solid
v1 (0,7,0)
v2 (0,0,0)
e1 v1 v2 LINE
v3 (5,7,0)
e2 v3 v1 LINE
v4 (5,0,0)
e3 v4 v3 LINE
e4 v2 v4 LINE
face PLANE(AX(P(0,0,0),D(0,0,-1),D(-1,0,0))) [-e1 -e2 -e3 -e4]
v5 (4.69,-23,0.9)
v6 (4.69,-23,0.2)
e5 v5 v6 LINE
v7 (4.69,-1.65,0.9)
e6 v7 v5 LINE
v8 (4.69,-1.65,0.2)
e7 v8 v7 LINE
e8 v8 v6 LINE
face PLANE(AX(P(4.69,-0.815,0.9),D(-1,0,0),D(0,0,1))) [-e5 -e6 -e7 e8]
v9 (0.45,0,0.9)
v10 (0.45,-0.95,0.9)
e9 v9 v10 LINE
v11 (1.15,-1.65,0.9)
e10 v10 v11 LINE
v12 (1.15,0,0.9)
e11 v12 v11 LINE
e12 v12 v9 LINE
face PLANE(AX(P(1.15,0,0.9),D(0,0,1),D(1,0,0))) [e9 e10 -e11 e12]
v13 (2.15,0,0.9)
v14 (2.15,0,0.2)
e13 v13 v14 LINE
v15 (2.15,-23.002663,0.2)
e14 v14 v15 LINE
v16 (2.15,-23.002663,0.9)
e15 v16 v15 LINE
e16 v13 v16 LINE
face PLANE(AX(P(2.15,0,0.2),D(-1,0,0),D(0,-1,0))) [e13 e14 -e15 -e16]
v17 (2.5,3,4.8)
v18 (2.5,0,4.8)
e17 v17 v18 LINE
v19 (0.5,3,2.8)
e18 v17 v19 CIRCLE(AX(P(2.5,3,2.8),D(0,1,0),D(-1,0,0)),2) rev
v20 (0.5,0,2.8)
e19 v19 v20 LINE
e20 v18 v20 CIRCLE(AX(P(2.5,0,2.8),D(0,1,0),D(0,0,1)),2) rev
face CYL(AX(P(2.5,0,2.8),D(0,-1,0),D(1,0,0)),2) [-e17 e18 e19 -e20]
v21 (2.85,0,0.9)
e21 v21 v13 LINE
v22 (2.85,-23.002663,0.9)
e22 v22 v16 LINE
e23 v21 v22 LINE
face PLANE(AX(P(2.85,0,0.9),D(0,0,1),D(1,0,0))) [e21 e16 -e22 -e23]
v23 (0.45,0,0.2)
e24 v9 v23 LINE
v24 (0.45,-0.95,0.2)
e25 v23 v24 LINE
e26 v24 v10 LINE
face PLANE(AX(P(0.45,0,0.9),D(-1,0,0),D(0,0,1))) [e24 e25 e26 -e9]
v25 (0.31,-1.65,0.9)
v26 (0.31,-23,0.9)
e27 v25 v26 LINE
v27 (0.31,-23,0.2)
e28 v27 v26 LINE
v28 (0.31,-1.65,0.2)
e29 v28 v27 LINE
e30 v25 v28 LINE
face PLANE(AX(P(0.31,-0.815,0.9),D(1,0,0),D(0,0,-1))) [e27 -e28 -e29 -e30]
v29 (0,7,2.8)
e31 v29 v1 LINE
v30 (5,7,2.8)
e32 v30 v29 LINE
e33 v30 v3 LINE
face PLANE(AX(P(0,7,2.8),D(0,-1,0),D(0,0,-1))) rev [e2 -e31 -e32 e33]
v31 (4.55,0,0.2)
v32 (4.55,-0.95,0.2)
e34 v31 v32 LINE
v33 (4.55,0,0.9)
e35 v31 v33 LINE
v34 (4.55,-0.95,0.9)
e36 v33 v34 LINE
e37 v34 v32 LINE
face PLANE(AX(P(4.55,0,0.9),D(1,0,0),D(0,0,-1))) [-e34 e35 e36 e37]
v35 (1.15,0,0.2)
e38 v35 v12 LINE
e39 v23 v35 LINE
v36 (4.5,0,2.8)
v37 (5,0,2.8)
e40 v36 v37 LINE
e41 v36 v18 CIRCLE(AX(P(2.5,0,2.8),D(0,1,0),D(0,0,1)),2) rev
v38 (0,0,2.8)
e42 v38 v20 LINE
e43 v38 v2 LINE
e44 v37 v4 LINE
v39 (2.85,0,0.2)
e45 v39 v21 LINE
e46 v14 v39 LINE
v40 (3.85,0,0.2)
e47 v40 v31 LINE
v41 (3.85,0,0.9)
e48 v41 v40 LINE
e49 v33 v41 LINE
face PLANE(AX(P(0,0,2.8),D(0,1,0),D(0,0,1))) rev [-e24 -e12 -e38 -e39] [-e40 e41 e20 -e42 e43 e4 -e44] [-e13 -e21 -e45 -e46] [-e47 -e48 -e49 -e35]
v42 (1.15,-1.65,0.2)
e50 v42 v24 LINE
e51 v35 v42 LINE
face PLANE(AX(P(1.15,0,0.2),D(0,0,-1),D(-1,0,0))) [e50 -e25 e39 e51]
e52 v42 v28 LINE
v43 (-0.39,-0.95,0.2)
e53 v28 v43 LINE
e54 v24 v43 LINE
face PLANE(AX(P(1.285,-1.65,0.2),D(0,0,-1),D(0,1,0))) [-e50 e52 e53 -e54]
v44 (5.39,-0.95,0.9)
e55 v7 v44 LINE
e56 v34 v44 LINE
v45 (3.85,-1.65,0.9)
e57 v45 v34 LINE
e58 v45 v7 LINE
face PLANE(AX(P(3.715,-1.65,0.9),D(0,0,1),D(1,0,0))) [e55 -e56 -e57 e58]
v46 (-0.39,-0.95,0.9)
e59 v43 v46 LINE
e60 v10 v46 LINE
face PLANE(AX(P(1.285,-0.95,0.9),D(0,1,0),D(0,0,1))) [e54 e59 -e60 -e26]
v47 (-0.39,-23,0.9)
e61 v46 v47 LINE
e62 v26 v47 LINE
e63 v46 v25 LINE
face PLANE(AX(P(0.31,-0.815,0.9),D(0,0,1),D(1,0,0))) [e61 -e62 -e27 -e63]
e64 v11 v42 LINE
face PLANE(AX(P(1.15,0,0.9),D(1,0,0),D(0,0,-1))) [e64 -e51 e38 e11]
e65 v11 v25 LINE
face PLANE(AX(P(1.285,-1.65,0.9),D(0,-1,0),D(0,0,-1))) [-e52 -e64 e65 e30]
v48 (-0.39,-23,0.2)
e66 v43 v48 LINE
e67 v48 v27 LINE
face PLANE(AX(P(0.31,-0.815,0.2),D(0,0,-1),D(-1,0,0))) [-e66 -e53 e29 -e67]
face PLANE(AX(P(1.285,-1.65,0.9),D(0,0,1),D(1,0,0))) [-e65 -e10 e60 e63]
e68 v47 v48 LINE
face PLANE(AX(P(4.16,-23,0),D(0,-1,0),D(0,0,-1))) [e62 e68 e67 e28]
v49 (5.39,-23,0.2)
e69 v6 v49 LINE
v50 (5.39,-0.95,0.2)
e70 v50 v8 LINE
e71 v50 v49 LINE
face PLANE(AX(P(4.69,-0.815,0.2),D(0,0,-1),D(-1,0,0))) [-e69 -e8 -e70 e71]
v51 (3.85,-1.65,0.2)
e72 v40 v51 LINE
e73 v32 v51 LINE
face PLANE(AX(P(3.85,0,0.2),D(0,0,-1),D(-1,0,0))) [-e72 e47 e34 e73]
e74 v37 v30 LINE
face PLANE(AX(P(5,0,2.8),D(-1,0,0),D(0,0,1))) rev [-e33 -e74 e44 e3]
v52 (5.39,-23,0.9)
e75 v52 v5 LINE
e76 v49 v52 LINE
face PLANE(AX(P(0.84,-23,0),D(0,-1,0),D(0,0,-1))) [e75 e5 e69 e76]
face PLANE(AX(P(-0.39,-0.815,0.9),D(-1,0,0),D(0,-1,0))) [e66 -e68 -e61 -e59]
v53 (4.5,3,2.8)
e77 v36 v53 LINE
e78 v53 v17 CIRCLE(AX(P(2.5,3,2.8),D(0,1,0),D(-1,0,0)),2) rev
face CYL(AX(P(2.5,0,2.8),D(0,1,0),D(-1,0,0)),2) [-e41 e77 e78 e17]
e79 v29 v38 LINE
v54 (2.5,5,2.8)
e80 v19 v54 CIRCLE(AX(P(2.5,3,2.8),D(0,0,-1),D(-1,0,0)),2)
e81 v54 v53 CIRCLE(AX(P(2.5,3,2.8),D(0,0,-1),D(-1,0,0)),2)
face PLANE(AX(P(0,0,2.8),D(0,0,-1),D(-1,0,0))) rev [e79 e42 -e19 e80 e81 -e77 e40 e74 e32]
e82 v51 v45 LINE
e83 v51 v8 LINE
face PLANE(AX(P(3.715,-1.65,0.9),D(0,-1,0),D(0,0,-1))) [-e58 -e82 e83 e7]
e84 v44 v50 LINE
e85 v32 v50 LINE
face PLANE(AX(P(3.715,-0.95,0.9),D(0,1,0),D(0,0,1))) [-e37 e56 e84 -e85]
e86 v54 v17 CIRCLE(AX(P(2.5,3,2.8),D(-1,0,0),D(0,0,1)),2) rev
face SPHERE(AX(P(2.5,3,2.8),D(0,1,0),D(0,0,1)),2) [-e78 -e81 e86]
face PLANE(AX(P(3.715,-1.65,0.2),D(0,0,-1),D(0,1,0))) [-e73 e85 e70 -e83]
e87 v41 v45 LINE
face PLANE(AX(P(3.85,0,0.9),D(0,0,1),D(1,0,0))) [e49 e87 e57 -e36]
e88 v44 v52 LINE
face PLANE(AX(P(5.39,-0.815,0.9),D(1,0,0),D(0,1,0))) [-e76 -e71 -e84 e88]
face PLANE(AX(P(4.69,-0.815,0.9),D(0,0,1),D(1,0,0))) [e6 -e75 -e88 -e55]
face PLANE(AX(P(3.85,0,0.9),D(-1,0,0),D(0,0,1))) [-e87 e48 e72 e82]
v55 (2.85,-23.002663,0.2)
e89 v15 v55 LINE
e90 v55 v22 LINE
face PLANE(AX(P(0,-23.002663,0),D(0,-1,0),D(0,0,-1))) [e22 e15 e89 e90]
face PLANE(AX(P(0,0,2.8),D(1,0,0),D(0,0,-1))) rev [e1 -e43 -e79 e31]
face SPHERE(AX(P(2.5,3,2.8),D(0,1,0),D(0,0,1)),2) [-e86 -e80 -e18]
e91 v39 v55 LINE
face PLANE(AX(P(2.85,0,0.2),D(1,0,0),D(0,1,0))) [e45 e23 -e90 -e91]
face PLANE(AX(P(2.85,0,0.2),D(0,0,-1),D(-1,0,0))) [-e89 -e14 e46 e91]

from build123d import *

# Parameters (mm, degrees)
IZIM1_W                     = 5
IZIM1_H                     = 7
Y_KSEKLIK_EKSTR_ZYON1_DEPTH = 2.8
IZIM2_W                     = 4
IZIM2_H                     = 5
Y_KSEKLIK_EKSTR_ZYON2_DEPTH = 2
RADYUS2_R                   = 2
IZIM3_W                     = 0.7
IZIM3_H                     = 0.7
IZIM5_W                     = 0.7
IZIM5_H                     = 0.7


with BuildPart() as part:
    # Çizim1 → Yükseklik-Ekstrüzyon1 (new body)
    with BuildSketch(Plane.XY):
        with Locations((2.5, 3.5)):
            Rectangle(IZIM1_W, IZIM1_H)
    extrude(amount=Y_KSEKLIK_EKSTR_ZYON1_DEPTH)

    # Çizim2 → Yükseklik-Ekstrüzyon2 (add)
    with BuildSketch(Plane.XY.offset(2.8)):
        with Locations((2.5, 2.5)):
            Rectangle(IZIM2_W, IZIM2_H)
    extrude(amount=Y_KSEKLIK_EKSTR_ZYON2_DEPTH)

    # Radyus2
    radyus2_edges = [part.edges().sort_by_distance(p)[0] for p in [
        (4.5, 2.5, 4.8),
    ]]
    fillet(radyus2_edges, radius=RADYUS2_R - 0.0001)  # a hair under: the kernel refuses the full size
    radyus2_2_edges = [part.edges().sort_by_distance(p)[0] for p in [
        (1.50005, 5, 4.8),
    ]]
    fillet(radyus2_2_edges, radius=RADYUS2_R - 0.0001)  # a hair under: the kernel refuses the full size
    radyus2_3_edges = [part.edges().sort_by_distance(p)[0] for p in [
        (0.5, 1.50005, 4.8),
    ]]
    fillet(radyus2_3_edges, radius=RADYUS2_R - 0.0001)  # a hair under: the kernel refuses the full size

    # Süpür1: sweep along a path in Çizim4
    with BuildLine(Plane(origin=(0, 0, 0.55), x_dir=(-1, 0, 0), z_dir=(0, 0, -1))) as s_p_r1_path:
        Line((-4.2, 0), (-4.2, -1.3))
        Line((-4.2, -1.3), (-5.04, -1.3))
        Line((-5.04, -1.3), (-5.04, -23))
    # Çizim3 → Süpür1 (sweep)
    with BuildSketch(Plane.XZ):
        with Locations((4.2, 0.55)):
            Rectangle(IZIM3_W, IZIM3_H)
    s_p_r1 = sweep(path=s_p_r1_path.line, transition=Transition.RIGHT)

    # Aynalama1: Süpür1 across plane
    add(s_p_r1.mirror(Plane(origin=(2.5, 0, 0), x_dir=(0, 0, 1), z_dir=(1, 0, 0))))

    # Süpür2: sweep along a path in Çizim6
    with BuildLine(Plane(origin=(0, 0, 0.55), x_dir=(-1, 0, 0), z_dir=(0, 0, -1))) as s_p_r2_path:
        Line((-2.5, 0), (-2.5, -23.002662889))
    # Çizim5 → Süpür2 (sweep)
    with BuildSketch(Plane.XZ):
        with Locations((2.5, 0.55)):
            Rectangle(IZIM5_W, IZIM5_H)
    sweep(path=s_p_r2_path.line)


solid = part.part
